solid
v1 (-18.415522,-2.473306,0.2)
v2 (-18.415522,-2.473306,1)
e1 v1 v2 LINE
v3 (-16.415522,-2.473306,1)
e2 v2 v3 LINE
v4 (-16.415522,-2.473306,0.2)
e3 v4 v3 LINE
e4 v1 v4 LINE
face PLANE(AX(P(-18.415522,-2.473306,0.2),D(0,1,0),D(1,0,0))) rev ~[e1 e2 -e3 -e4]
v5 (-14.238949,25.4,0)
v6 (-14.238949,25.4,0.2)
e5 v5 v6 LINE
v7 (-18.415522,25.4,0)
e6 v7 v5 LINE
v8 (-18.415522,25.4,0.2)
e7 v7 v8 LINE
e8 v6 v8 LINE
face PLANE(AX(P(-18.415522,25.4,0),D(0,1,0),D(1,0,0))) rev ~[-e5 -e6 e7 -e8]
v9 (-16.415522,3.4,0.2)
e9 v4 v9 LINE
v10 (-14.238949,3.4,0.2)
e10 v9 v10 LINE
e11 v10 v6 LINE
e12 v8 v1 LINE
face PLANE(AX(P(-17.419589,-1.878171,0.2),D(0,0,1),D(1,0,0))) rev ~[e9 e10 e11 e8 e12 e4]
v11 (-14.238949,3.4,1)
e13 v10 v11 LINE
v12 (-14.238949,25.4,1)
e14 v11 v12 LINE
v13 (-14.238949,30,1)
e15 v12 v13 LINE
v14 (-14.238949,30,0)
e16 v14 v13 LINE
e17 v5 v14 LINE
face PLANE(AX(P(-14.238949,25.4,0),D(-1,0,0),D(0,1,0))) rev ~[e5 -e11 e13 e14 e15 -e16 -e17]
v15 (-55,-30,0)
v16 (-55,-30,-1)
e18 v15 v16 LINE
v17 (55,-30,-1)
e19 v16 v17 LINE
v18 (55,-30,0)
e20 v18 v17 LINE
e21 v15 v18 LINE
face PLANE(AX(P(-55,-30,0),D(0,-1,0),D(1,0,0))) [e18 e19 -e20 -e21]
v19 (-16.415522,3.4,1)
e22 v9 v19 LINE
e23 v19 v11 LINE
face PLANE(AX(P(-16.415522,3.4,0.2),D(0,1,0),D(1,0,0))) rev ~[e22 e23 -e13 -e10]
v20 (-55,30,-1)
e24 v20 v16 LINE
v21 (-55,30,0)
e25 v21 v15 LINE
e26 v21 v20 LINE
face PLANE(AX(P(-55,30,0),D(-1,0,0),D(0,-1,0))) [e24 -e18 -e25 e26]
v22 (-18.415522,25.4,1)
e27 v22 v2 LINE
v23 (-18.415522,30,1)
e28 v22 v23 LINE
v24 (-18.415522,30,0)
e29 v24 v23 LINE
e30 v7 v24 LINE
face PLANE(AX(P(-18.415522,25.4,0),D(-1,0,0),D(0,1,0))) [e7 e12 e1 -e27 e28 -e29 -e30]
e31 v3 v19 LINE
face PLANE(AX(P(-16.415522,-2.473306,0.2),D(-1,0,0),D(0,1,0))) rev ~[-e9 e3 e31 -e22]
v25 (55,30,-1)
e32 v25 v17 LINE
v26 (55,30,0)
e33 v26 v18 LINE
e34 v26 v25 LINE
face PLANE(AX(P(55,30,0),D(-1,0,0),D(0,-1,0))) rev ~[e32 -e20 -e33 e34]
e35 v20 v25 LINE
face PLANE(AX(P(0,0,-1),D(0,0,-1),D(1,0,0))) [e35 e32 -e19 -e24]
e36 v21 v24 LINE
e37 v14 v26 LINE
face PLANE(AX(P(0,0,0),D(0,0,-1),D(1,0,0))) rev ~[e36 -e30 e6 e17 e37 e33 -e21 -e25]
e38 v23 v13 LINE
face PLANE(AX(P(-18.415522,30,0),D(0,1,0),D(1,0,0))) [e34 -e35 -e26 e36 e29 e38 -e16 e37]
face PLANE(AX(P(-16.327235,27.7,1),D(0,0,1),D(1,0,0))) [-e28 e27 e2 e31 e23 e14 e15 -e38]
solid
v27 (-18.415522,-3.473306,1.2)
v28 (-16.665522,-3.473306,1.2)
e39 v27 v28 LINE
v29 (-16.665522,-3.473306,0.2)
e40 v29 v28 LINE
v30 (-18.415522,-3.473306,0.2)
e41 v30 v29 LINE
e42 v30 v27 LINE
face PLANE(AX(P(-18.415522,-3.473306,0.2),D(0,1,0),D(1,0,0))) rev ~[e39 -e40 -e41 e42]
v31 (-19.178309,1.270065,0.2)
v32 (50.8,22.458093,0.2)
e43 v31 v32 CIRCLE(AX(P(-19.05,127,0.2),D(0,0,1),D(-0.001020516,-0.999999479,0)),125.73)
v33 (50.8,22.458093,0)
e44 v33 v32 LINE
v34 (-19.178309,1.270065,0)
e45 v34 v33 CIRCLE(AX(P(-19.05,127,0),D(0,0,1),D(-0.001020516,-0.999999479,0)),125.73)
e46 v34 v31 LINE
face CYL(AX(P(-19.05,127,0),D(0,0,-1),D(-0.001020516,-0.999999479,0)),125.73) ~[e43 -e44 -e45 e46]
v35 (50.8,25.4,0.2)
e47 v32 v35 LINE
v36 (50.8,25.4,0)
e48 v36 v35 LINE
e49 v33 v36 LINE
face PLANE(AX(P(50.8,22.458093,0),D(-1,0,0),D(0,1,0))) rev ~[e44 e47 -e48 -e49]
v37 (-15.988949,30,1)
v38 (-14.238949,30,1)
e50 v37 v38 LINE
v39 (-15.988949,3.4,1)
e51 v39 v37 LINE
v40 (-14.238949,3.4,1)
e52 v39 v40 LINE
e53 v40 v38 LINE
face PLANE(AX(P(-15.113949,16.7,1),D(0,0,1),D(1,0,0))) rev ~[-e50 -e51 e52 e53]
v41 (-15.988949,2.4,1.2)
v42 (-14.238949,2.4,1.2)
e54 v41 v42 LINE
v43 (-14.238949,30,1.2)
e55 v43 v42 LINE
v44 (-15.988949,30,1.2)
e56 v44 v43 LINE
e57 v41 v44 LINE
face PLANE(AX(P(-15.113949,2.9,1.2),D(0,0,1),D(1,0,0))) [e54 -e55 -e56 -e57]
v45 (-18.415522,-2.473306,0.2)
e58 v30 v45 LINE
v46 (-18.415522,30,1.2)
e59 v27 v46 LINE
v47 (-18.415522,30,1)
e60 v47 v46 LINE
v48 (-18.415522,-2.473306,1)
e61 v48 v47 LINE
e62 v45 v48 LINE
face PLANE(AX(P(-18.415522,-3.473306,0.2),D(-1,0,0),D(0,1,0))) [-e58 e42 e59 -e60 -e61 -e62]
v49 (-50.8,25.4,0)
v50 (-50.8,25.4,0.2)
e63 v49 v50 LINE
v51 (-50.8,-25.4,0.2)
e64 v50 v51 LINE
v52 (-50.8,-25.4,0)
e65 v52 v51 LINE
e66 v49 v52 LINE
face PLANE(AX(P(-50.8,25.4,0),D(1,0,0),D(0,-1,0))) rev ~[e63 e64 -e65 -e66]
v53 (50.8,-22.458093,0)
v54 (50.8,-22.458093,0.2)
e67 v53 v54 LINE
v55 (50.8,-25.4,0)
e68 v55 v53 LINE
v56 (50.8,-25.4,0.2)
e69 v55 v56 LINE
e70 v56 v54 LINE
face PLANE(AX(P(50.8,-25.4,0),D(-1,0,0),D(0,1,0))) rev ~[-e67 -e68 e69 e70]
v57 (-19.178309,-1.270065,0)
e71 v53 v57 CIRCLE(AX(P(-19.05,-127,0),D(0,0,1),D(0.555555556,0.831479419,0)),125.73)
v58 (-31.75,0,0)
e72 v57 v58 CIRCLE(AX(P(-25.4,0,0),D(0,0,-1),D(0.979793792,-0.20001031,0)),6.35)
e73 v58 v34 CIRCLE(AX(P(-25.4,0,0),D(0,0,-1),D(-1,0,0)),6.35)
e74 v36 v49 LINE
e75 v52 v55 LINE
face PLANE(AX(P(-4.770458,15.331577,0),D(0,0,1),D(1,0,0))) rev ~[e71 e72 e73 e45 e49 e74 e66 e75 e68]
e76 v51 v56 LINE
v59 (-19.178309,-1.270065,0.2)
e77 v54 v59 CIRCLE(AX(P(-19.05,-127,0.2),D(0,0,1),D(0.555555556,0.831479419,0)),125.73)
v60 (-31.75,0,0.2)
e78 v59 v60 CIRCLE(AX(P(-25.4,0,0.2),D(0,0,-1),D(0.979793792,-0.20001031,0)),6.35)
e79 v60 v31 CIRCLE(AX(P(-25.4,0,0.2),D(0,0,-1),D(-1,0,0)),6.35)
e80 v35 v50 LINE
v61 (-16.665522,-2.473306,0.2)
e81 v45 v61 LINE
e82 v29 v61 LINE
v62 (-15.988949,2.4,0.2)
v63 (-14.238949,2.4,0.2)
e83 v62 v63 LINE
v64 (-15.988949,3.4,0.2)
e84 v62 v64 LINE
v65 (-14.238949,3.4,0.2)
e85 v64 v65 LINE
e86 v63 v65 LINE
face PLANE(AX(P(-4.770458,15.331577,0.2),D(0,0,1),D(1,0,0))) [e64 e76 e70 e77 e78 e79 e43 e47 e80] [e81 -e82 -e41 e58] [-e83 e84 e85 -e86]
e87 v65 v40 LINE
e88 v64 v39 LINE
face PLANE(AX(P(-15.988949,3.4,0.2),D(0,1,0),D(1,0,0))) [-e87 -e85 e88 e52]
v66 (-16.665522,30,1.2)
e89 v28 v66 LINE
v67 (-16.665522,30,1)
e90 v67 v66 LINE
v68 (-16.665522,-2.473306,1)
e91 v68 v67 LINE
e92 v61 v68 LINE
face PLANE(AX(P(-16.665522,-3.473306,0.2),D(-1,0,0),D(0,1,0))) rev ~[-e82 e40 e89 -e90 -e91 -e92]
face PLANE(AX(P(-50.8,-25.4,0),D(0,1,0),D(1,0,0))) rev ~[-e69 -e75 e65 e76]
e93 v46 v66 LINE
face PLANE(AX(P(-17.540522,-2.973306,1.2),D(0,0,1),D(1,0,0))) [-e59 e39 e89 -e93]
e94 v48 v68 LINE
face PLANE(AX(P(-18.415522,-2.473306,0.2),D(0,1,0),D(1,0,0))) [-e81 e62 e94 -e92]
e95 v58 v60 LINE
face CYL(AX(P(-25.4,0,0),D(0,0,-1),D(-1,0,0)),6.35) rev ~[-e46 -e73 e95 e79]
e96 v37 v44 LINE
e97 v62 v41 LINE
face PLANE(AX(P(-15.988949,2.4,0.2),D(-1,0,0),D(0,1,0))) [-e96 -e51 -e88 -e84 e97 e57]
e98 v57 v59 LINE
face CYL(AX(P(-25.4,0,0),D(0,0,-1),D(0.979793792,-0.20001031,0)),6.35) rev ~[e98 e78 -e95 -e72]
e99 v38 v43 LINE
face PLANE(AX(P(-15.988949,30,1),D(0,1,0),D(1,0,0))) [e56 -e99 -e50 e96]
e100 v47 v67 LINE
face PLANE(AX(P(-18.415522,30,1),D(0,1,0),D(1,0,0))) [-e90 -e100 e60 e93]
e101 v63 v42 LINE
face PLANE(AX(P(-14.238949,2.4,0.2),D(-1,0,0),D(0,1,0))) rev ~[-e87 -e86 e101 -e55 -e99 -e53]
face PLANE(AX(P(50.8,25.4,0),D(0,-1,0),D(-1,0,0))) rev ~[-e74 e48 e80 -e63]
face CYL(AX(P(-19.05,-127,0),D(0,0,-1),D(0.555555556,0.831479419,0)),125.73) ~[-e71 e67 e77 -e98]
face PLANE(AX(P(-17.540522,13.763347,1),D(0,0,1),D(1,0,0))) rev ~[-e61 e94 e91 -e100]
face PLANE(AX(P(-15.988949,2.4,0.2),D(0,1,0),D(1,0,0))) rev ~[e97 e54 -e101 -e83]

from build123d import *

# Parameters (mm, degrees)
F1_DEPTH  = 0.2
F2_W      = 110
F2_H      = 60
F3_DEPTH  = 1
F5_DEPTH  = 0.8
F6_W      = 4.1765728965
F6_H      = 4.6
F7_DEPTH  = 1
F8_W      = 1.75
F8_H      = 32.4733061887
F9_DEPTH  = 0.2
F8_H_2    = 26.6
F10_W     = 1.75
F10_H     = 1
F11_DEPTH = 1


with BuildPart() as f1:
    # F0 (on Top) → F1 (new body)
    with BuildSketch(Plane.XY):
        with BuildLine():
            Line((-50.8, 25.4), (-50.8, 0))
            Line((-50.8, 0), (-31.75, 0))
            ThreePointArc((-31.75, 0), (-26.0382651501, 6.3178412134), (-19.1783094179, 1.2700654709))
            ThreePointArc((-19.1783094179, 1.2700654709), (17.3850333876, 6.6649625336), (50.8, 22.4580926135))
            Line((50.8, 22.4580926135), (50.8, 25.4))
            Line((50.8, 25.4), (-50.8, 25.4))
        make_face()
        with BuildLine():
            Line((-50.8, -25.4), (50.8, -25.4))
            Line((50.8, -25.4), (50.8, -22.4580926135))
            ThreePointArc((50.8, -22.4580926135), (17.3850333876, -6.6649625336), (-19.1783094179, -1.2700654709))
            ThreePointArc((-19.1783094179, -1.2700654709), (-26.0382651501, -6.3178412134), (-31.75, 0))
            Line((-31.75, 0), (-50.8, 0))
            Line((-50.8, 0), (-50.8, -25.4))
        make_face()
    extrude(amount=F1_DEPTH)



with BuildPart() as f3:
    # F2 (on face) → F3 (new body)
    with BuildSketch(Plane(origin=(0, 0, 0), x_dir=(1, 0, 0), z_dir=(0, 0, -1))):
        Rectangle(F2_W, F2_H)
        with BuildLine():
            Line((-50.8, -25.4), (-50.8, 25.4))
            Line((-50.8, 25.4), (50.8, 25.4))
            Line((50.8, 25.4), (50.8, 22.4580926135))
            ThreePointArc((50.8, 22.4580926135), (17.3850333876, 6.6649625336), (-19.1783094179, 1.2700654709))
            ThreePointArc((-19.1783094179, 1.2700654709), (-31.75, 0), (-19.1783094179, -1.2700654709))
            ThreePointArc((-19.1783094179, -1.2700654709), (17.3850333876, -6.6649625336), (50.8, -22.4580926135))
            Line((50.8, -22.4580926135), (50.8, -25.4))
            Line((50.8, -25.4), (-50.8, -25.4))
        make_face(mode=Mode.SUBTRACT)
        with BuildLine():
            Line((50.8, 25.4), (-50.8, 25.4))
            Line((-50.8, 25.4), (-50.8, -25.4))
            Line((-50.8, -25.4), (50.8, -25.4))
            Line((50.8, -25.4), (50.8, -22.4580926135))
            ThreePointArc((50.8, -22.4580926135), (17.3850333876, -6.6649625336), (-19.1783094179, -1.2700654709))
            ThreePointArc((-19.1783094179, -1.2700654709), (-31.75, 0), (-19.1783094179, 1.2700654709))
            ThreePointArc((-19.1783094179, 1.2700654709), (17.3850333876, 6.6649625336), (50.8, 22.4580926135))
            Line((50.8, 22.4580926135), (50.8, 25.4))
        make_face()
    extrude(amount=F3_DEPTH)



with BuildPart() as f5:
    # F4 (on face) → F5 (new body)
    with BuildSketch(Plane.XY.offset(0.2)):
        with BuildLine():
            ThreePointArc((-16.4155218303, -1.2976037429), (-17.4154701214, -1.2806251524), (-18.4155218303, -1.2716009111))
            Line((-18.4155218303, -1.2716009111), (-18.4155218303, -2.4733061887))
            Line((-18.4155218303, -2.4733061887), (-16.4155218303, -2.4733061887))
            Line((-16.4155218303, -2.4733061887), (-16.4155218303, -1.2976037429))
        make_face()
        with BuildLine():
            ThreePointArc((-16.4155218303, 1.2976037429), (-17.4154701214, 1.2806251524), (-18.4155218303, 1.2716009111))
            Line((-18.4155218303, 1.2716009111), (-18.4155218303, -1.2716009111))
            ThreePointArc((-18.4155218303, -1.2716009111), (-17.4154701214, -1.2806251524), (-16.4155218303, -1.2976037429))
            Line((-16.4155218303, -1.2976037429), (-16.4155218303, 1.2976037429))
        make_face()
        with BuildLine():
            Line((-16.4155218303, 3.4), (-18.4155218303, 3.4))
            Line((-18.4155218303, 3.4), (-18.4155218303, 1.2716009111))
            ThreePointArc((-18.4155218303, 1.2716009111), (-17.4154701214, 1.2806251524), (-16.4155218303, 1.2976037429))
            Line((-16.4155218303, 1.2976037429), (-16.4155218303, 3.4))
        make_face()
        Polygon((-18.4155218303, 25.4), (-18.4155218303, 3.4), (-16.4155218303, 3.4), (-14.2389489338, 3.4), (-14.2389489338, 25.4), align=None)
    extrude(amount=F5_DEPTH)


with BuildPart() as f3_1:
    add(f3.part)

    add(f5.part)  # F7 merges F5
    # F6 (on face) → F7 (join)
    with BuildSketch(Plane.XY):
        with Locations((-16.3272353821, 27.7)):
            Rectangle(F6_W, F6_H)
    extrude(amount=F7_DEPTH)


with BuildPart() as f9:
    # F8 (on face) → F9 (new body)
    with BuildSketch(Plane.XY.offset(1)):
        with Locations((-17.5405218303, 13.7633469056)):
            Rectangle(F8_W, F8_H)
    extrude(amount=F9_DEPTH)


with BuildPart() as f9b:
    # F8 (on face) → F9, piece 2 (new body)
    with BuildSketch(Plane.XY.offset(1)):
        with Locations((-15.1139489338, 16.7)):
            Rectangle(F8_W, F8_H_2)
    extrude(amount=F9_DEPTH)


with BuildPart() as f1_1:
    add(f1.part)

    add(f9.part)  # F11 merges F9

    add(f9b.part)  # F11 merges F9b
    # F10 (on face) → F11 (join)
    with BuildSketch(Plane.XY.offset(0.2)):
        with Locations((-17.5405218303, -2.9733061887)):
            Rectangle(F10_W, F10_H)
        with Locations((-15.1139489338, 2.9)):
            Rectangle(F10_W, F10_H)
    extrude(amount=F11_DEPTH)


solid = Compound([f3_1.part, f1_1.part])
